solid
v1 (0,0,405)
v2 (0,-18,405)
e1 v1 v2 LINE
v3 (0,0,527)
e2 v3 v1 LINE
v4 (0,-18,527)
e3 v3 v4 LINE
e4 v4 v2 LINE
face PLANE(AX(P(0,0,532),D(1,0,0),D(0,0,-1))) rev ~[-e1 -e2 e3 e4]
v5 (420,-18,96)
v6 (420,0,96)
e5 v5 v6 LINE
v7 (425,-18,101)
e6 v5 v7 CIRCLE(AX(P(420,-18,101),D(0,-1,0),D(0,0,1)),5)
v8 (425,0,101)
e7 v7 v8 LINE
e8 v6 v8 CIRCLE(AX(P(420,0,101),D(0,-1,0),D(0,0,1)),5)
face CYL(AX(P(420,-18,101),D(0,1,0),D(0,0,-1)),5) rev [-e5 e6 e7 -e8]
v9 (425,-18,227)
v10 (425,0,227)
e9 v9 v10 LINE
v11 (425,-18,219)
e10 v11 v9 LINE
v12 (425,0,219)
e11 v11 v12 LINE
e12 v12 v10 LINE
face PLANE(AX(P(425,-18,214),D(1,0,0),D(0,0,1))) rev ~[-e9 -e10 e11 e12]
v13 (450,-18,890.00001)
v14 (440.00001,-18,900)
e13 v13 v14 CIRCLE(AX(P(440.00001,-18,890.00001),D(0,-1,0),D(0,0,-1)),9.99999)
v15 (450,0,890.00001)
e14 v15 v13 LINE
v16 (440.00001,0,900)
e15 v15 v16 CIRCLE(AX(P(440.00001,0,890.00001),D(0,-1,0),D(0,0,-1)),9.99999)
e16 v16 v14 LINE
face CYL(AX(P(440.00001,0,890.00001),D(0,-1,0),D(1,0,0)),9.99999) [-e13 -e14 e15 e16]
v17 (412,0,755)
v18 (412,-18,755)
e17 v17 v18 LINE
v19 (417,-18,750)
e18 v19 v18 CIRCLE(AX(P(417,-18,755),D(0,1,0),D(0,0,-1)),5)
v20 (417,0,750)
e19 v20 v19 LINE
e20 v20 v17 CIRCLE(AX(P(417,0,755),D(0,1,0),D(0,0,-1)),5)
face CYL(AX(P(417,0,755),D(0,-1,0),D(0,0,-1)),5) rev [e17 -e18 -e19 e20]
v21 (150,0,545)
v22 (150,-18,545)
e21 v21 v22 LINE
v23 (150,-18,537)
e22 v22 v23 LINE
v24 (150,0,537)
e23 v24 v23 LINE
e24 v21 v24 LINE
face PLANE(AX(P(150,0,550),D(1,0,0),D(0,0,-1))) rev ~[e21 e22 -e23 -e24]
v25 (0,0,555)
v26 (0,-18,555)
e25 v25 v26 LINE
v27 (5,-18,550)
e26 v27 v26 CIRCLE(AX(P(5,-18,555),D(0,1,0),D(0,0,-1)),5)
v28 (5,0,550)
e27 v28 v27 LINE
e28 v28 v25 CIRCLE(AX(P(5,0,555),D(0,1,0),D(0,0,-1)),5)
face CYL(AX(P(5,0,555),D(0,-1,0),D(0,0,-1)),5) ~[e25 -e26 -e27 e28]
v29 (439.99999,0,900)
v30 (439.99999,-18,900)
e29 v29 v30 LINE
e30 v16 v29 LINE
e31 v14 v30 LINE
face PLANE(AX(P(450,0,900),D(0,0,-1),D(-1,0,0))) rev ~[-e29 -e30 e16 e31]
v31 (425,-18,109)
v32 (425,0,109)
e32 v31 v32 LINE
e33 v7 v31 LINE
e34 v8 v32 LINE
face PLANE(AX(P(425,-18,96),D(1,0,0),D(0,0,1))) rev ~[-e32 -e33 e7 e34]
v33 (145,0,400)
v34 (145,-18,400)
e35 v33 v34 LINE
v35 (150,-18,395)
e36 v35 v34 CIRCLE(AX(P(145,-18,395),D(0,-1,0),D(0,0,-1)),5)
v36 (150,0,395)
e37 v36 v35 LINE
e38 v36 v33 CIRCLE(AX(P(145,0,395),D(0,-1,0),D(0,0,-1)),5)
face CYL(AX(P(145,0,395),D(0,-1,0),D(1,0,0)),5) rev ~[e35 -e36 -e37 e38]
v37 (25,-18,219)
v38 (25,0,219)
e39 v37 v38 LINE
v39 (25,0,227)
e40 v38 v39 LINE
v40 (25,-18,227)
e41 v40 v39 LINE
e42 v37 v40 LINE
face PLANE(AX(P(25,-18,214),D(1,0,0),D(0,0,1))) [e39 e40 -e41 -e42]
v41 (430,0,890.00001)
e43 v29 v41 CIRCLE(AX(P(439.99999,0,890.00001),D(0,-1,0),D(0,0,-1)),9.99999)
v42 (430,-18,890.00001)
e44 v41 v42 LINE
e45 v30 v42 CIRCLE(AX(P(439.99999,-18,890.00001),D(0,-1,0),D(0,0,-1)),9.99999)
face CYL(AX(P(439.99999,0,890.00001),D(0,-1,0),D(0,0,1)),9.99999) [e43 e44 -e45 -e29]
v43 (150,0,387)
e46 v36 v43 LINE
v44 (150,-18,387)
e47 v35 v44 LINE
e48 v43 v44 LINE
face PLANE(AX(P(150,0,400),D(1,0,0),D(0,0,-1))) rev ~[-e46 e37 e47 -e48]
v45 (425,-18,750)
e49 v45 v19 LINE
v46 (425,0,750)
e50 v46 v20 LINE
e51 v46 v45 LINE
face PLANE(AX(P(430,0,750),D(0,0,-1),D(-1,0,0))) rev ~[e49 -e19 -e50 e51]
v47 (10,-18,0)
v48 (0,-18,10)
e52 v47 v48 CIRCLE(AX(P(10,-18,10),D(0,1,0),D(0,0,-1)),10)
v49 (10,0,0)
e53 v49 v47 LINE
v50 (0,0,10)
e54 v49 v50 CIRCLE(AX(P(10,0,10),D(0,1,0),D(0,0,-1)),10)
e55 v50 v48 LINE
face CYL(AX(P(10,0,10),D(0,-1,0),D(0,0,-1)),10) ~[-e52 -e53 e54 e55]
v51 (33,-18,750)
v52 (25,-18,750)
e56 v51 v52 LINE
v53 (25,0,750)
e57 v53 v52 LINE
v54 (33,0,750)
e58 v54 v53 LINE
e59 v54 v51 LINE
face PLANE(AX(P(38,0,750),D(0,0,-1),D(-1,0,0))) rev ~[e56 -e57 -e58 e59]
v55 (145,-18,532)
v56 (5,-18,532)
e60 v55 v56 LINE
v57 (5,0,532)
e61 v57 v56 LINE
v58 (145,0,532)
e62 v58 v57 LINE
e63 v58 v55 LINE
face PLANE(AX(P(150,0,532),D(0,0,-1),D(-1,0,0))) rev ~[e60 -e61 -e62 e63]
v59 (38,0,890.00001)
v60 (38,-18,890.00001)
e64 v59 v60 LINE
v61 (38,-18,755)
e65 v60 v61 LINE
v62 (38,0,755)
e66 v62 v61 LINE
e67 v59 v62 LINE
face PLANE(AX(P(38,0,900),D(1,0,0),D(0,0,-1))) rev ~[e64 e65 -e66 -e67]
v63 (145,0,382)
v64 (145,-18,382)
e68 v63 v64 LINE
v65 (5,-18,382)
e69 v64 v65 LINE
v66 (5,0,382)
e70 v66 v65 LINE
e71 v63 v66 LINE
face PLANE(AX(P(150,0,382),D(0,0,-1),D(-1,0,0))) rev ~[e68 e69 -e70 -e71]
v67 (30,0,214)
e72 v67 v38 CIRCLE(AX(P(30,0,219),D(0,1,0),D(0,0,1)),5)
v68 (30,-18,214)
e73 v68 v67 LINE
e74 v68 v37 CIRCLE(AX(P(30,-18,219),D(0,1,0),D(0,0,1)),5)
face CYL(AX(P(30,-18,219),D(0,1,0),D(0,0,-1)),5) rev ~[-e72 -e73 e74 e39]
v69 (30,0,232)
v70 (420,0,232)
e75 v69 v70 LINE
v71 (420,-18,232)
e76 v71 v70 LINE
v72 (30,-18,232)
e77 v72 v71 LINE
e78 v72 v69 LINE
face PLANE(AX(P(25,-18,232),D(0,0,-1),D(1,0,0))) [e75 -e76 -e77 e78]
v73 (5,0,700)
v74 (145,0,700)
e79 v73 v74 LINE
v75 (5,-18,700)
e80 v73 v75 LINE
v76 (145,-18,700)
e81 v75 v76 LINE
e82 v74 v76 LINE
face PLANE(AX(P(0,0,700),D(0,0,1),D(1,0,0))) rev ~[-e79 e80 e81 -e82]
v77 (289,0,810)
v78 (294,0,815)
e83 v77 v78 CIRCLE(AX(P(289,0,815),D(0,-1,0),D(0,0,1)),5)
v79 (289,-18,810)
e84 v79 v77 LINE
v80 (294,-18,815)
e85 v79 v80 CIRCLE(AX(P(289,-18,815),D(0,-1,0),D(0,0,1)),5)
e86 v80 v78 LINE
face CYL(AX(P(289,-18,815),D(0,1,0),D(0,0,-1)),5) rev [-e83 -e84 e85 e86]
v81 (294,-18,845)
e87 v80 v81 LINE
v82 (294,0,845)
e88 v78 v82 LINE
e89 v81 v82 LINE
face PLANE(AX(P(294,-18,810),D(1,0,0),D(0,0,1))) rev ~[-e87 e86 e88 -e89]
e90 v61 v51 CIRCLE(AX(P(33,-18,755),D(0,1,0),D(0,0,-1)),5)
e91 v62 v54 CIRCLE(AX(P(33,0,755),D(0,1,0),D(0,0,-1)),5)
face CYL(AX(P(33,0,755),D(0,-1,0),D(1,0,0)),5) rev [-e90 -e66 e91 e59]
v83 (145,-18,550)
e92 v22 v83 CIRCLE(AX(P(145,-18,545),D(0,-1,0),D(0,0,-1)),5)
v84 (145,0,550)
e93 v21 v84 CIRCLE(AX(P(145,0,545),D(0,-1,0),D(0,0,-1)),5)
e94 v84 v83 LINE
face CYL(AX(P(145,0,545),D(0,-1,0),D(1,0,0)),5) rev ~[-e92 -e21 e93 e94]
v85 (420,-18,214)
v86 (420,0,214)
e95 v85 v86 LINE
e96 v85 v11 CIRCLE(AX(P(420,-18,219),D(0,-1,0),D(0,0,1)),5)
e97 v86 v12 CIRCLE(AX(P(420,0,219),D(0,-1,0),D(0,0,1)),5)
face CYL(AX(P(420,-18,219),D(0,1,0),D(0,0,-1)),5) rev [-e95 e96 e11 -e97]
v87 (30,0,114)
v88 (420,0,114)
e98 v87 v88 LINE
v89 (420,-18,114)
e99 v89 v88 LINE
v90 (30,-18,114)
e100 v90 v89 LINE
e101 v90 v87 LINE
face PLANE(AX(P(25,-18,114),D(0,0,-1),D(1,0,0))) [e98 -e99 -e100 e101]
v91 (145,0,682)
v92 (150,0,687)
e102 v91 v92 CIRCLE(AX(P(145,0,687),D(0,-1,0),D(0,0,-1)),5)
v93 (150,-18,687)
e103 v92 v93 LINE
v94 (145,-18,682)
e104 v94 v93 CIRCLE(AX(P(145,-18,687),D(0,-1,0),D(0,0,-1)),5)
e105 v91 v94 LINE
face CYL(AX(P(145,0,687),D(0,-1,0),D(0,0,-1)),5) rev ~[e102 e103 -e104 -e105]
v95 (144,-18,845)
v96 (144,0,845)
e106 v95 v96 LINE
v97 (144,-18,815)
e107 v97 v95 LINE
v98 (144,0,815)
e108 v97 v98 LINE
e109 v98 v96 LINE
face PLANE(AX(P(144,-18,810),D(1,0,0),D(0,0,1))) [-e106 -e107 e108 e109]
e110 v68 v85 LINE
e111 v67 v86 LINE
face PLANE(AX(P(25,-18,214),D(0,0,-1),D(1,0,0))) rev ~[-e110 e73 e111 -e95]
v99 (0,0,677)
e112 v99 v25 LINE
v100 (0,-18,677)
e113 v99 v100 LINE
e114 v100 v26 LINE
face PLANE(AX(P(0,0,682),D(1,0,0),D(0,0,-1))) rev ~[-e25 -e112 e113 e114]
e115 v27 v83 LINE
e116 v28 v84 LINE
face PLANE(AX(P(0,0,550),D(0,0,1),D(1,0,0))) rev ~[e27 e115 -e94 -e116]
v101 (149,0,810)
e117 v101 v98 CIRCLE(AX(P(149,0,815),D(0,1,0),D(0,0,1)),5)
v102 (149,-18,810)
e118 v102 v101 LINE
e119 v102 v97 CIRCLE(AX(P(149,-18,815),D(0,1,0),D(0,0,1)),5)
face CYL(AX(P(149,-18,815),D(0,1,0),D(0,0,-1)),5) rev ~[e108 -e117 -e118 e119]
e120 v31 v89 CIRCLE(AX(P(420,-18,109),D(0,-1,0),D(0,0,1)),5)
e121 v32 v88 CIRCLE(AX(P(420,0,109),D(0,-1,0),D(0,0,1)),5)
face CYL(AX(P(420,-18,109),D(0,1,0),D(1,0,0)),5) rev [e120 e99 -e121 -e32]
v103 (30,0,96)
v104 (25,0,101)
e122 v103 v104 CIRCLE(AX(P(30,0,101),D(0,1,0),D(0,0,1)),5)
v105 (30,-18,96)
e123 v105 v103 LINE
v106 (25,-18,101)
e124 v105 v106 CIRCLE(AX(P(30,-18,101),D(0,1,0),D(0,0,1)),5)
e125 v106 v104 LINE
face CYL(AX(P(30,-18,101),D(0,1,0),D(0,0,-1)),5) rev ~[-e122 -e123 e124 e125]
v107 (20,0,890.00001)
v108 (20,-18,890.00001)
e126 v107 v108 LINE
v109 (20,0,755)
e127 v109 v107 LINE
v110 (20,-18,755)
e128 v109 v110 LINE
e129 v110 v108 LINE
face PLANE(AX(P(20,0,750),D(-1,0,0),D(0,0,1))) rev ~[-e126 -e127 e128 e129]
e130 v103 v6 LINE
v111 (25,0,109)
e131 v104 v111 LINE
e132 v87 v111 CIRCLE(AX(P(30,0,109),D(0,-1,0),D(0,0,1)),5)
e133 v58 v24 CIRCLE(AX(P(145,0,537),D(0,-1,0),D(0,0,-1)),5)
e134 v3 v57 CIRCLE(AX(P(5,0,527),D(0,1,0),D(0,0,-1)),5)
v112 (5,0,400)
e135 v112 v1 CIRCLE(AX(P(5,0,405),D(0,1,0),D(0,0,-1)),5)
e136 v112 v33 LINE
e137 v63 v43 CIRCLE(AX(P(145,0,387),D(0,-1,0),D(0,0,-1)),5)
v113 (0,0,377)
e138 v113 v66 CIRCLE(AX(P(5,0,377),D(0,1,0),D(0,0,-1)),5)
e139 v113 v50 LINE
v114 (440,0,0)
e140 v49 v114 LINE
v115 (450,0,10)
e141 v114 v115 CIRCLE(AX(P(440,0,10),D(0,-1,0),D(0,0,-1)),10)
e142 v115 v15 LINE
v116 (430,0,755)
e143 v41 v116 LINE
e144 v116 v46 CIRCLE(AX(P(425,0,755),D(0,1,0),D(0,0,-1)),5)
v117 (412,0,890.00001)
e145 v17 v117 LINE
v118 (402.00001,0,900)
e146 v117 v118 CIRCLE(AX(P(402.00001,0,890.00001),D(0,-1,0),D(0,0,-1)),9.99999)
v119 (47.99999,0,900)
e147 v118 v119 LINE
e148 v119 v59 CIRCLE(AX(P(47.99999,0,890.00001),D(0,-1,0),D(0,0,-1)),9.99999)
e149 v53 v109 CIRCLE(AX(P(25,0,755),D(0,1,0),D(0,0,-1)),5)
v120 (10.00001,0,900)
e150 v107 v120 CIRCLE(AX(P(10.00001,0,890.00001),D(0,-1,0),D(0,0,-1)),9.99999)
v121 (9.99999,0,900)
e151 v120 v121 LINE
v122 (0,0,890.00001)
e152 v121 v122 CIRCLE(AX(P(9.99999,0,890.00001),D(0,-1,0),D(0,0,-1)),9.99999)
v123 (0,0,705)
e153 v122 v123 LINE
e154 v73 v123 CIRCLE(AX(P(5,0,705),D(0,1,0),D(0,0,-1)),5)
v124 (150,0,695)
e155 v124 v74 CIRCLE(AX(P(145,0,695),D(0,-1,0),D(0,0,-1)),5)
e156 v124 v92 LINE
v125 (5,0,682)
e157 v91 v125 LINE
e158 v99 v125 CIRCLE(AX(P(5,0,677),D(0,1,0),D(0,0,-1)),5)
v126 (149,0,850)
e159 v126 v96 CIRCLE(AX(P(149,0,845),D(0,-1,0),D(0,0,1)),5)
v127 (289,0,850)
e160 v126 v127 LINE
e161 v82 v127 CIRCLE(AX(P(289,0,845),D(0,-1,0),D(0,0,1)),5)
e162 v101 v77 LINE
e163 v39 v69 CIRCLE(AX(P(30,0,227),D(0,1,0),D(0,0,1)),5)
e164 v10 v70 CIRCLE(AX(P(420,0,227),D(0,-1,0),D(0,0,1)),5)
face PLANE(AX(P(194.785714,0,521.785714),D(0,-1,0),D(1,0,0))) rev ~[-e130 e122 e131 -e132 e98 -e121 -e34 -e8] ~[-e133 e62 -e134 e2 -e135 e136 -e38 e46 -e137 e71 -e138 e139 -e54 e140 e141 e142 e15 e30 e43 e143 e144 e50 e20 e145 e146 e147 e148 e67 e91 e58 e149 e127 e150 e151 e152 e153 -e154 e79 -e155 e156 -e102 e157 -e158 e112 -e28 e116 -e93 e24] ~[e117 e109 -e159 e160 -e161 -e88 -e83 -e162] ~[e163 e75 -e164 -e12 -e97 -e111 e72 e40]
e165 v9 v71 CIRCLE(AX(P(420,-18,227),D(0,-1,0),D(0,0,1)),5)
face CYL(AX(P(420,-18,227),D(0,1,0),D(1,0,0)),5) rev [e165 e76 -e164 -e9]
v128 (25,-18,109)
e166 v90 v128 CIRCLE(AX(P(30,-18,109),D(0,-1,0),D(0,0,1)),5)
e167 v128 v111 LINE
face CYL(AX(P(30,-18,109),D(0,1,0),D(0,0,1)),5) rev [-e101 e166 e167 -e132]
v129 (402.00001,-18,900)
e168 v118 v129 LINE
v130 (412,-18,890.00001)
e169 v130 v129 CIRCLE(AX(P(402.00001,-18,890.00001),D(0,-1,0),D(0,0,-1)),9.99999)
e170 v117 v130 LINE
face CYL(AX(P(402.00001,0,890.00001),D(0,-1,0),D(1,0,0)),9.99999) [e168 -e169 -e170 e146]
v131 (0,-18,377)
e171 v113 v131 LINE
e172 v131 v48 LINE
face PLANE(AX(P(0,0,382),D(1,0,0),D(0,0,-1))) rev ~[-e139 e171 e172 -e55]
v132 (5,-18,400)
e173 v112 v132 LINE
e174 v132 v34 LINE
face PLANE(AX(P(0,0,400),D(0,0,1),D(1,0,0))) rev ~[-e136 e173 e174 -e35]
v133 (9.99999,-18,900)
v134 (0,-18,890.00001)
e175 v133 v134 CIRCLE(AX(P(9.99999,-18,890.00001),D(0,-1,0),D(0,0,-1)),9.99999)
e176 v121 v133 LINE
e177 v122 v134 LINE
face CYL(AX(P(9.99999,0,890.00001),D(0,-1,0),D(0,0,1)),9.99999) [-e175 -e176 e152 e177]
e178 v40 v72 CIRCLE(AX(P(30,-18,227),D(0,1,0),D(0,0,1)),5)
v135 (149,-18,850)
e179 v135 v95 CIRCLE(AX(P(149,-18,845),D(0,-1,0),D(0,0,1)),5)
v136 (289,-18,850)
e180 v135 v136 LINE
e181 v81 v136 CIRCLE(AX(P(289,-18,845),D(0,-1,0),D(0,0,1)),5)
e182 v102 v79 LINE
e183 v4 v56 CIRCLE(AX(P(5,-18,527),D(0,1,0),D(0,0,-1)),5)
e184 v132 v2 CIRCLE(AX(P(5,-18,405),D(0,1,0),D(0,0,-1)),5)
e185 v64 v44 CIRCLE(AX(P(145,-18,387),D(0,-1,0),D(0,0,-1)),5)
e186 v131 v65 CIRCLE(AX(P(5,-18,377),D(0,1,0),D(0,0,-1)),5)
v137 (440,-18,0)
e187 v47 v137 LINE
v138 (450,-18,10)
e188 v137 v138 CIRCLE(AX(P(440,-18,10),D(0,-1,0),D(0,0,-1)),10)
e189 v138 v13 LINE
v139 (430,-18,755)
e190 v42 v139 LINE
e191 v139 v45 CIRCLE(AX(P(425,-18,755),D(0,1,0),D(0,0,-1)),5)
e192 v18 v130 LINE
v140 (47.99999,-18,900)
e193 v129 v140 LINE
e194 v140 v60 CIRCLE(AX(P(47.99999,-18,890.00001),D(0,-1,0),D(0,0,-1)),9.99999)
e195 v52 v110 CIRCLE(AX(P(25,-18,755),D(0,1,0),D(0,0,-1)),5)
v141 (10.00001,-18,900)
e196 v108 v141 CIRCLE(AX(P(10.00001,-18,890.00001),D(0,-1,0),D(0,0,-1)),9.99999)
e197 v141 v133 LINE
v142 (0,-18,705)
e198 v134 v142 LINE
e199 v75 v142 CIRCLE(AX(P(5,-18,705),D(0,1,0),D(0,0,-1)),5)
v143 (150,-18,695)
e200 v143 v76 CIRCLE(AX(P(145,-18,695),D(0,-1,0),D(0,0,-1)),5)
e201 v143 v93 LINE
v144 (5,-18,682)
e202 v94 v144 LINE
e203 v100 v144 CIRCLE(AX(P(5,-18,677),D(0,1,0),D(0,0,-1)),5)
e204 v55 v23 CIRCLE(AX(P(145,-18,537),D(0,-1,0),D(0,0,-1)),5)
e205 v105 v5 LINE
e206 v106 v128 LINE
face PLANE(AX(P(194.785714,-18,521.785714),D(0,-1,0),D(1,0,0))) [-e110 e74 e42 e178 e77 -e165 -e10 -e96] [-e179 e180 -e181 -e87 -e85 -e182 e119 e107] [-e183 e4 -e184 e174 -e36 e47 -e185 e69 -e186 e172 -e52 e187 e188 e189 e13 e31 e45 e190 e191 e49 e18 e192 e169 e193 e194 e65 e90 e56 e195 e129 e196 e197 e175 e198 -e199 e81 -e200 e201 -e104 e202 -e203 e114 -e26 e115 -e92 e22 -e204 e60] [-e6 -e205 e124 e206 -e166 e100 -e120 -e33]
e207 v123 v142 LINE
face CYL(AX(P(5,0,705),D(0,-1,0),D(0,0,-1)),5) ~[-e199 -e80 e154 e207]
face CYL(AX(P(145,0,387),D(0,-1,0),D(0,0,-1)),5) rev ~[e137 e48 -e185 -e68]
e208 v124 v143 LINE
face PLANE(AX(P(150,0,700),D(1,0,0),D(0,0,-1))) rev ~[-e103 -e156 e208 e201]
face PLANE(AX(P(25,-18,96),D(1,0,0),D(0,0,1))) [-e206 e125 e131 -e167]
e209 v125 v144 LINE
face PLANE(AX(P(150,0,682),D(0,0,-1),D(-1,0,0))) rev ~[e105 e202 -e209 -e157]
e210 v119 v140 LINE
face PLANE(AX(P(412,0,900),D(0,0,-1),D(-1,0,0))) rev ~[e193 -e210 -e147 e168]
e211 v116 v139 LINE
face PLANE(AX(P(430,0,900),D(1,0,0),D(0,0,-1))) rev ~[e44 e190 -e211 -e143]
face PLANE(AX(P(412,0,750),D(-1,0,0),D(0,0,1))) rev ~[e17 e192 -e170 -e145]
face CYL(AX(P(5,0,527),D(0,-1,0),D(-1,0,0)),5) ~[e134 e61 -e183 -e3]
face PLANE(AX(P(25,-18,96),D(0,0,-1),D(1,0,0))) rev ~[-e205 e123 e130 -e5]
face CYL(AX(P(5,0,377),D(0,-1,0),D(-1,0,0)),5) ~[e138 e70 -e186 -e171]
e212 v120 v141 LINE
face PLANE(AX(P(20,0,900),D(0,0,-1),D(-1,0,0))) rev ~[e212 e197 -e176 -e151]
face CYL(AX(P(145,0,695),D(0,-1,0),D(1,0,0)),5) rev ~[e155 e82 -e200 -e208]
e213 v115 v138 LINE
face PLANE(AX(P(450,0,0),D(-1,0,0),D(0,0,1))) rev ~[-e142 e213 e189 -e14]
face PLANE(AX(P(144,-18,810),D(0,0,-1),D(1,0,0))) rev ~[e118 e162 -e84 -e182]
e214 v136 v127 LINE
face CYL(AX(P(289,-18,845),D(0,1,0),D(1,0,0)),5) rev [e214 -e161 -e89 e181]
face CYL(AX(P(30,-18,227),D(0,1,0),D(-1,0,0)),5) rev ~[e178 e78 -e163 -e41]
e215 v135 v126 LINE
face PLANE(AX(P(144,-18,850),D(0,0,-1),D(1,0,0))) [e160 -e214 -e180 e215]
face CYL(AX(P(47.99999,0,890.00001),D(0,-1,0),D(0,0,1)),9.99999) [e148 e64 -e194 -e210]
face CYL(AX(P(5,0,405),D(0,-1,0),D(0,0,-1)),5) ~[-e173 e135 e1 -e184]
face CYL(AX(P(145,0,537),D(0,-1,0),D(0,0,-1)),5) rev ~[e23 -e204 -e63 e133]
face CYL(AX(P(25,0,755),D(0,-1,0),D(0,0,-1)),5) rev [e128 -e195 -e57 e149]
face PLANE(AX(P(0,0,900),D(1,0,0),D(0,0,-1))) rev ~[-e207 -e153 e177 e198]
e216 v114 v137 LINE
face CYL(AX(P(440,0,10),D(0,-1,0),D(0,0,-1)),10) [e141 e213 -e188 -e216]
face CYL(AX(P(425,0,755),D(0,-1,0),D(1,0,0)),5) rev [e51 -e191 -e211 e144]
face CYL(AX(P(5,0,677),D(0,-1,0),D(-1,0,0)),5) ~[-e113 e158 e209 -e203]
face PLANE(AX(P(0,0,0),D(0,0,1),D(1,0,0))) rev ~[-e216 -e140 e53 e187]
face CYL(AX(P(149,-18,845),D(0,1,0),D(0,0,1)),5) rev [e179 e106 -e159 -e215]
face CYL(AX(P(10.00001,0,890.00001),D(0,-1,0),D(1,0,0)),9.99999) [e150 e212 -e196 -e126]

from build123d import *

# Parameters (mm, degrees)
F1_DEPTH  = 18
F2_W      = 400
F2_H      = 18
F3_DEPTH  = 25
F4_W      = 400
F4_H      = 18
F5_DEPTH  = 25
F6_R      = 10
F7_R      = 10
F8_R      = 9.99999
F9_R      = 5
F10_R     = 5
F11_R     = 5
F12_W     = 150
F12_H     = 40
F13_DEPTH = 25
F14_R     = 5


# Not quite as in the source:
# - a fillet or chamfer is up to 0.001 mm smaller than in the source, because OpenCascade refuses the exact size


with BuildPart() as f1:
    # F0 (on Front) → F1 (new body)
    with BuildSketch(Plane.XZ):
        Polygon((0, 382), (0, 0), (450, 0), (450, 900), (430, 900), (430, 750), (412, 750), (412, 900), (38, 900), (38, 750), (20, 750), (20, 900), (0, 900), (0, 700), (150, 700), (150, 682), (0, 682), (0, 550), (150, 550), (150, 532), (0, 532), (0, 400), (150, 400), (150, 382), align=None)
    extrude(amount=F1_DEPTH)

    # F2 (on face) → F3 (cut)
    with BuildSketch(Plane.XZ.offset(18)):
        with Locations((225, 223)):
            Rectangle(F2_W, F2_H)
    extrude(amount=-F3_DEPTH, mode=Mode.SUBTRACT)

    # F4 (on face) → F5 (cut)
    with BuildSketch(Plane.XZ.offset(18)):
        with Locations((225, 105)):
            Rectangle(F4_W, F4_H)
    extrude(amount=-F5_DEPTH, mode=Mode.SUBTRACT)

    # F6
    f6_edges = [f1.edges().sort_by_distance(p)[0] for p in [
        (450, -9, 0),
    ]]
    fillet(f6_edges, radius=F6_R)

    # F7
    f7_edges = [f1.edges().sort_by_distance(p)[0] for p in [
        (0, -9, 0),
    ]]
    fillet(f7_edges, radius=F7_R)

    # F8 (radius 10 in the source; OpenCascade refuses exactly that, so slightly less here)
    f8_edges = [f1.edges().sort_by_distance(p)[0] for p in [
        (450, -9, 900),
        (430, -9, 900),
        (412, -9, 900),
        (38, -9, 900),
        (20, -9, 900),
        (0, -9, 900),
    ]]
    fillet(f8_edges, radius=F8_R)

    # F9
    f9_edges = [f1.edges().sort_by_distance(p)[0] for p in [
        (0, -9, 382),
        (0, -9, 400),
        (0, -9, 532),
        (0, -9, 550),
        (0, -9, 682),
        (0, -9, 700),
    ]]
    fillet(f9_edges, radius=F9_R)

    # F10
    f10_edges = [f1.edges().sort_by_distance(p)[0] for p in [
        (25, -9, 232),
        (25, -9, 214),
        (25, -9, 96),
        (25, -9, 114),
        (425, -9, 114),
        (425, -9, 96),
        (425, -9, 214),
        (425, -9, 232),
    ]]
    fillet(f10_edges, radius=F10_R)

    # F11
    f11_edges = [f1.edges().sort_by_distance(p)[0] for p in [
        (150, -9, 382),
        (150, -9, 400),
        (150, -9, 532),
        (150, -9, 550),
        (150, -9, 700),
        (150, -9, 682),
        (38, -9, 750),
        (20, -9, 750),
        (412, -9, 750),
        (430, -9, 750),
    ]]
    fillet(f11_edges, radius=F11_R)

    # F12 (on face) → F13 (cut)
    with BuildSketch(Plane.XZ.offset(18)):
        with Locations((219, 830)):
            Rectangle(F12_W, F12_H)
    extrude(amount=-F13_DEPTH, mode=Mode.SUBTRACT)

    # F14
    f14_edges = [f1.edges().sort_by_distance(p)[0] for p in [
        (144, -9, 810),
        (144, -9, 850),
        (294, -9, 850),
        (294, -9, 810),
    ]]
    fillet(f14_edges, radius=F14_R)


solid = f1.part
